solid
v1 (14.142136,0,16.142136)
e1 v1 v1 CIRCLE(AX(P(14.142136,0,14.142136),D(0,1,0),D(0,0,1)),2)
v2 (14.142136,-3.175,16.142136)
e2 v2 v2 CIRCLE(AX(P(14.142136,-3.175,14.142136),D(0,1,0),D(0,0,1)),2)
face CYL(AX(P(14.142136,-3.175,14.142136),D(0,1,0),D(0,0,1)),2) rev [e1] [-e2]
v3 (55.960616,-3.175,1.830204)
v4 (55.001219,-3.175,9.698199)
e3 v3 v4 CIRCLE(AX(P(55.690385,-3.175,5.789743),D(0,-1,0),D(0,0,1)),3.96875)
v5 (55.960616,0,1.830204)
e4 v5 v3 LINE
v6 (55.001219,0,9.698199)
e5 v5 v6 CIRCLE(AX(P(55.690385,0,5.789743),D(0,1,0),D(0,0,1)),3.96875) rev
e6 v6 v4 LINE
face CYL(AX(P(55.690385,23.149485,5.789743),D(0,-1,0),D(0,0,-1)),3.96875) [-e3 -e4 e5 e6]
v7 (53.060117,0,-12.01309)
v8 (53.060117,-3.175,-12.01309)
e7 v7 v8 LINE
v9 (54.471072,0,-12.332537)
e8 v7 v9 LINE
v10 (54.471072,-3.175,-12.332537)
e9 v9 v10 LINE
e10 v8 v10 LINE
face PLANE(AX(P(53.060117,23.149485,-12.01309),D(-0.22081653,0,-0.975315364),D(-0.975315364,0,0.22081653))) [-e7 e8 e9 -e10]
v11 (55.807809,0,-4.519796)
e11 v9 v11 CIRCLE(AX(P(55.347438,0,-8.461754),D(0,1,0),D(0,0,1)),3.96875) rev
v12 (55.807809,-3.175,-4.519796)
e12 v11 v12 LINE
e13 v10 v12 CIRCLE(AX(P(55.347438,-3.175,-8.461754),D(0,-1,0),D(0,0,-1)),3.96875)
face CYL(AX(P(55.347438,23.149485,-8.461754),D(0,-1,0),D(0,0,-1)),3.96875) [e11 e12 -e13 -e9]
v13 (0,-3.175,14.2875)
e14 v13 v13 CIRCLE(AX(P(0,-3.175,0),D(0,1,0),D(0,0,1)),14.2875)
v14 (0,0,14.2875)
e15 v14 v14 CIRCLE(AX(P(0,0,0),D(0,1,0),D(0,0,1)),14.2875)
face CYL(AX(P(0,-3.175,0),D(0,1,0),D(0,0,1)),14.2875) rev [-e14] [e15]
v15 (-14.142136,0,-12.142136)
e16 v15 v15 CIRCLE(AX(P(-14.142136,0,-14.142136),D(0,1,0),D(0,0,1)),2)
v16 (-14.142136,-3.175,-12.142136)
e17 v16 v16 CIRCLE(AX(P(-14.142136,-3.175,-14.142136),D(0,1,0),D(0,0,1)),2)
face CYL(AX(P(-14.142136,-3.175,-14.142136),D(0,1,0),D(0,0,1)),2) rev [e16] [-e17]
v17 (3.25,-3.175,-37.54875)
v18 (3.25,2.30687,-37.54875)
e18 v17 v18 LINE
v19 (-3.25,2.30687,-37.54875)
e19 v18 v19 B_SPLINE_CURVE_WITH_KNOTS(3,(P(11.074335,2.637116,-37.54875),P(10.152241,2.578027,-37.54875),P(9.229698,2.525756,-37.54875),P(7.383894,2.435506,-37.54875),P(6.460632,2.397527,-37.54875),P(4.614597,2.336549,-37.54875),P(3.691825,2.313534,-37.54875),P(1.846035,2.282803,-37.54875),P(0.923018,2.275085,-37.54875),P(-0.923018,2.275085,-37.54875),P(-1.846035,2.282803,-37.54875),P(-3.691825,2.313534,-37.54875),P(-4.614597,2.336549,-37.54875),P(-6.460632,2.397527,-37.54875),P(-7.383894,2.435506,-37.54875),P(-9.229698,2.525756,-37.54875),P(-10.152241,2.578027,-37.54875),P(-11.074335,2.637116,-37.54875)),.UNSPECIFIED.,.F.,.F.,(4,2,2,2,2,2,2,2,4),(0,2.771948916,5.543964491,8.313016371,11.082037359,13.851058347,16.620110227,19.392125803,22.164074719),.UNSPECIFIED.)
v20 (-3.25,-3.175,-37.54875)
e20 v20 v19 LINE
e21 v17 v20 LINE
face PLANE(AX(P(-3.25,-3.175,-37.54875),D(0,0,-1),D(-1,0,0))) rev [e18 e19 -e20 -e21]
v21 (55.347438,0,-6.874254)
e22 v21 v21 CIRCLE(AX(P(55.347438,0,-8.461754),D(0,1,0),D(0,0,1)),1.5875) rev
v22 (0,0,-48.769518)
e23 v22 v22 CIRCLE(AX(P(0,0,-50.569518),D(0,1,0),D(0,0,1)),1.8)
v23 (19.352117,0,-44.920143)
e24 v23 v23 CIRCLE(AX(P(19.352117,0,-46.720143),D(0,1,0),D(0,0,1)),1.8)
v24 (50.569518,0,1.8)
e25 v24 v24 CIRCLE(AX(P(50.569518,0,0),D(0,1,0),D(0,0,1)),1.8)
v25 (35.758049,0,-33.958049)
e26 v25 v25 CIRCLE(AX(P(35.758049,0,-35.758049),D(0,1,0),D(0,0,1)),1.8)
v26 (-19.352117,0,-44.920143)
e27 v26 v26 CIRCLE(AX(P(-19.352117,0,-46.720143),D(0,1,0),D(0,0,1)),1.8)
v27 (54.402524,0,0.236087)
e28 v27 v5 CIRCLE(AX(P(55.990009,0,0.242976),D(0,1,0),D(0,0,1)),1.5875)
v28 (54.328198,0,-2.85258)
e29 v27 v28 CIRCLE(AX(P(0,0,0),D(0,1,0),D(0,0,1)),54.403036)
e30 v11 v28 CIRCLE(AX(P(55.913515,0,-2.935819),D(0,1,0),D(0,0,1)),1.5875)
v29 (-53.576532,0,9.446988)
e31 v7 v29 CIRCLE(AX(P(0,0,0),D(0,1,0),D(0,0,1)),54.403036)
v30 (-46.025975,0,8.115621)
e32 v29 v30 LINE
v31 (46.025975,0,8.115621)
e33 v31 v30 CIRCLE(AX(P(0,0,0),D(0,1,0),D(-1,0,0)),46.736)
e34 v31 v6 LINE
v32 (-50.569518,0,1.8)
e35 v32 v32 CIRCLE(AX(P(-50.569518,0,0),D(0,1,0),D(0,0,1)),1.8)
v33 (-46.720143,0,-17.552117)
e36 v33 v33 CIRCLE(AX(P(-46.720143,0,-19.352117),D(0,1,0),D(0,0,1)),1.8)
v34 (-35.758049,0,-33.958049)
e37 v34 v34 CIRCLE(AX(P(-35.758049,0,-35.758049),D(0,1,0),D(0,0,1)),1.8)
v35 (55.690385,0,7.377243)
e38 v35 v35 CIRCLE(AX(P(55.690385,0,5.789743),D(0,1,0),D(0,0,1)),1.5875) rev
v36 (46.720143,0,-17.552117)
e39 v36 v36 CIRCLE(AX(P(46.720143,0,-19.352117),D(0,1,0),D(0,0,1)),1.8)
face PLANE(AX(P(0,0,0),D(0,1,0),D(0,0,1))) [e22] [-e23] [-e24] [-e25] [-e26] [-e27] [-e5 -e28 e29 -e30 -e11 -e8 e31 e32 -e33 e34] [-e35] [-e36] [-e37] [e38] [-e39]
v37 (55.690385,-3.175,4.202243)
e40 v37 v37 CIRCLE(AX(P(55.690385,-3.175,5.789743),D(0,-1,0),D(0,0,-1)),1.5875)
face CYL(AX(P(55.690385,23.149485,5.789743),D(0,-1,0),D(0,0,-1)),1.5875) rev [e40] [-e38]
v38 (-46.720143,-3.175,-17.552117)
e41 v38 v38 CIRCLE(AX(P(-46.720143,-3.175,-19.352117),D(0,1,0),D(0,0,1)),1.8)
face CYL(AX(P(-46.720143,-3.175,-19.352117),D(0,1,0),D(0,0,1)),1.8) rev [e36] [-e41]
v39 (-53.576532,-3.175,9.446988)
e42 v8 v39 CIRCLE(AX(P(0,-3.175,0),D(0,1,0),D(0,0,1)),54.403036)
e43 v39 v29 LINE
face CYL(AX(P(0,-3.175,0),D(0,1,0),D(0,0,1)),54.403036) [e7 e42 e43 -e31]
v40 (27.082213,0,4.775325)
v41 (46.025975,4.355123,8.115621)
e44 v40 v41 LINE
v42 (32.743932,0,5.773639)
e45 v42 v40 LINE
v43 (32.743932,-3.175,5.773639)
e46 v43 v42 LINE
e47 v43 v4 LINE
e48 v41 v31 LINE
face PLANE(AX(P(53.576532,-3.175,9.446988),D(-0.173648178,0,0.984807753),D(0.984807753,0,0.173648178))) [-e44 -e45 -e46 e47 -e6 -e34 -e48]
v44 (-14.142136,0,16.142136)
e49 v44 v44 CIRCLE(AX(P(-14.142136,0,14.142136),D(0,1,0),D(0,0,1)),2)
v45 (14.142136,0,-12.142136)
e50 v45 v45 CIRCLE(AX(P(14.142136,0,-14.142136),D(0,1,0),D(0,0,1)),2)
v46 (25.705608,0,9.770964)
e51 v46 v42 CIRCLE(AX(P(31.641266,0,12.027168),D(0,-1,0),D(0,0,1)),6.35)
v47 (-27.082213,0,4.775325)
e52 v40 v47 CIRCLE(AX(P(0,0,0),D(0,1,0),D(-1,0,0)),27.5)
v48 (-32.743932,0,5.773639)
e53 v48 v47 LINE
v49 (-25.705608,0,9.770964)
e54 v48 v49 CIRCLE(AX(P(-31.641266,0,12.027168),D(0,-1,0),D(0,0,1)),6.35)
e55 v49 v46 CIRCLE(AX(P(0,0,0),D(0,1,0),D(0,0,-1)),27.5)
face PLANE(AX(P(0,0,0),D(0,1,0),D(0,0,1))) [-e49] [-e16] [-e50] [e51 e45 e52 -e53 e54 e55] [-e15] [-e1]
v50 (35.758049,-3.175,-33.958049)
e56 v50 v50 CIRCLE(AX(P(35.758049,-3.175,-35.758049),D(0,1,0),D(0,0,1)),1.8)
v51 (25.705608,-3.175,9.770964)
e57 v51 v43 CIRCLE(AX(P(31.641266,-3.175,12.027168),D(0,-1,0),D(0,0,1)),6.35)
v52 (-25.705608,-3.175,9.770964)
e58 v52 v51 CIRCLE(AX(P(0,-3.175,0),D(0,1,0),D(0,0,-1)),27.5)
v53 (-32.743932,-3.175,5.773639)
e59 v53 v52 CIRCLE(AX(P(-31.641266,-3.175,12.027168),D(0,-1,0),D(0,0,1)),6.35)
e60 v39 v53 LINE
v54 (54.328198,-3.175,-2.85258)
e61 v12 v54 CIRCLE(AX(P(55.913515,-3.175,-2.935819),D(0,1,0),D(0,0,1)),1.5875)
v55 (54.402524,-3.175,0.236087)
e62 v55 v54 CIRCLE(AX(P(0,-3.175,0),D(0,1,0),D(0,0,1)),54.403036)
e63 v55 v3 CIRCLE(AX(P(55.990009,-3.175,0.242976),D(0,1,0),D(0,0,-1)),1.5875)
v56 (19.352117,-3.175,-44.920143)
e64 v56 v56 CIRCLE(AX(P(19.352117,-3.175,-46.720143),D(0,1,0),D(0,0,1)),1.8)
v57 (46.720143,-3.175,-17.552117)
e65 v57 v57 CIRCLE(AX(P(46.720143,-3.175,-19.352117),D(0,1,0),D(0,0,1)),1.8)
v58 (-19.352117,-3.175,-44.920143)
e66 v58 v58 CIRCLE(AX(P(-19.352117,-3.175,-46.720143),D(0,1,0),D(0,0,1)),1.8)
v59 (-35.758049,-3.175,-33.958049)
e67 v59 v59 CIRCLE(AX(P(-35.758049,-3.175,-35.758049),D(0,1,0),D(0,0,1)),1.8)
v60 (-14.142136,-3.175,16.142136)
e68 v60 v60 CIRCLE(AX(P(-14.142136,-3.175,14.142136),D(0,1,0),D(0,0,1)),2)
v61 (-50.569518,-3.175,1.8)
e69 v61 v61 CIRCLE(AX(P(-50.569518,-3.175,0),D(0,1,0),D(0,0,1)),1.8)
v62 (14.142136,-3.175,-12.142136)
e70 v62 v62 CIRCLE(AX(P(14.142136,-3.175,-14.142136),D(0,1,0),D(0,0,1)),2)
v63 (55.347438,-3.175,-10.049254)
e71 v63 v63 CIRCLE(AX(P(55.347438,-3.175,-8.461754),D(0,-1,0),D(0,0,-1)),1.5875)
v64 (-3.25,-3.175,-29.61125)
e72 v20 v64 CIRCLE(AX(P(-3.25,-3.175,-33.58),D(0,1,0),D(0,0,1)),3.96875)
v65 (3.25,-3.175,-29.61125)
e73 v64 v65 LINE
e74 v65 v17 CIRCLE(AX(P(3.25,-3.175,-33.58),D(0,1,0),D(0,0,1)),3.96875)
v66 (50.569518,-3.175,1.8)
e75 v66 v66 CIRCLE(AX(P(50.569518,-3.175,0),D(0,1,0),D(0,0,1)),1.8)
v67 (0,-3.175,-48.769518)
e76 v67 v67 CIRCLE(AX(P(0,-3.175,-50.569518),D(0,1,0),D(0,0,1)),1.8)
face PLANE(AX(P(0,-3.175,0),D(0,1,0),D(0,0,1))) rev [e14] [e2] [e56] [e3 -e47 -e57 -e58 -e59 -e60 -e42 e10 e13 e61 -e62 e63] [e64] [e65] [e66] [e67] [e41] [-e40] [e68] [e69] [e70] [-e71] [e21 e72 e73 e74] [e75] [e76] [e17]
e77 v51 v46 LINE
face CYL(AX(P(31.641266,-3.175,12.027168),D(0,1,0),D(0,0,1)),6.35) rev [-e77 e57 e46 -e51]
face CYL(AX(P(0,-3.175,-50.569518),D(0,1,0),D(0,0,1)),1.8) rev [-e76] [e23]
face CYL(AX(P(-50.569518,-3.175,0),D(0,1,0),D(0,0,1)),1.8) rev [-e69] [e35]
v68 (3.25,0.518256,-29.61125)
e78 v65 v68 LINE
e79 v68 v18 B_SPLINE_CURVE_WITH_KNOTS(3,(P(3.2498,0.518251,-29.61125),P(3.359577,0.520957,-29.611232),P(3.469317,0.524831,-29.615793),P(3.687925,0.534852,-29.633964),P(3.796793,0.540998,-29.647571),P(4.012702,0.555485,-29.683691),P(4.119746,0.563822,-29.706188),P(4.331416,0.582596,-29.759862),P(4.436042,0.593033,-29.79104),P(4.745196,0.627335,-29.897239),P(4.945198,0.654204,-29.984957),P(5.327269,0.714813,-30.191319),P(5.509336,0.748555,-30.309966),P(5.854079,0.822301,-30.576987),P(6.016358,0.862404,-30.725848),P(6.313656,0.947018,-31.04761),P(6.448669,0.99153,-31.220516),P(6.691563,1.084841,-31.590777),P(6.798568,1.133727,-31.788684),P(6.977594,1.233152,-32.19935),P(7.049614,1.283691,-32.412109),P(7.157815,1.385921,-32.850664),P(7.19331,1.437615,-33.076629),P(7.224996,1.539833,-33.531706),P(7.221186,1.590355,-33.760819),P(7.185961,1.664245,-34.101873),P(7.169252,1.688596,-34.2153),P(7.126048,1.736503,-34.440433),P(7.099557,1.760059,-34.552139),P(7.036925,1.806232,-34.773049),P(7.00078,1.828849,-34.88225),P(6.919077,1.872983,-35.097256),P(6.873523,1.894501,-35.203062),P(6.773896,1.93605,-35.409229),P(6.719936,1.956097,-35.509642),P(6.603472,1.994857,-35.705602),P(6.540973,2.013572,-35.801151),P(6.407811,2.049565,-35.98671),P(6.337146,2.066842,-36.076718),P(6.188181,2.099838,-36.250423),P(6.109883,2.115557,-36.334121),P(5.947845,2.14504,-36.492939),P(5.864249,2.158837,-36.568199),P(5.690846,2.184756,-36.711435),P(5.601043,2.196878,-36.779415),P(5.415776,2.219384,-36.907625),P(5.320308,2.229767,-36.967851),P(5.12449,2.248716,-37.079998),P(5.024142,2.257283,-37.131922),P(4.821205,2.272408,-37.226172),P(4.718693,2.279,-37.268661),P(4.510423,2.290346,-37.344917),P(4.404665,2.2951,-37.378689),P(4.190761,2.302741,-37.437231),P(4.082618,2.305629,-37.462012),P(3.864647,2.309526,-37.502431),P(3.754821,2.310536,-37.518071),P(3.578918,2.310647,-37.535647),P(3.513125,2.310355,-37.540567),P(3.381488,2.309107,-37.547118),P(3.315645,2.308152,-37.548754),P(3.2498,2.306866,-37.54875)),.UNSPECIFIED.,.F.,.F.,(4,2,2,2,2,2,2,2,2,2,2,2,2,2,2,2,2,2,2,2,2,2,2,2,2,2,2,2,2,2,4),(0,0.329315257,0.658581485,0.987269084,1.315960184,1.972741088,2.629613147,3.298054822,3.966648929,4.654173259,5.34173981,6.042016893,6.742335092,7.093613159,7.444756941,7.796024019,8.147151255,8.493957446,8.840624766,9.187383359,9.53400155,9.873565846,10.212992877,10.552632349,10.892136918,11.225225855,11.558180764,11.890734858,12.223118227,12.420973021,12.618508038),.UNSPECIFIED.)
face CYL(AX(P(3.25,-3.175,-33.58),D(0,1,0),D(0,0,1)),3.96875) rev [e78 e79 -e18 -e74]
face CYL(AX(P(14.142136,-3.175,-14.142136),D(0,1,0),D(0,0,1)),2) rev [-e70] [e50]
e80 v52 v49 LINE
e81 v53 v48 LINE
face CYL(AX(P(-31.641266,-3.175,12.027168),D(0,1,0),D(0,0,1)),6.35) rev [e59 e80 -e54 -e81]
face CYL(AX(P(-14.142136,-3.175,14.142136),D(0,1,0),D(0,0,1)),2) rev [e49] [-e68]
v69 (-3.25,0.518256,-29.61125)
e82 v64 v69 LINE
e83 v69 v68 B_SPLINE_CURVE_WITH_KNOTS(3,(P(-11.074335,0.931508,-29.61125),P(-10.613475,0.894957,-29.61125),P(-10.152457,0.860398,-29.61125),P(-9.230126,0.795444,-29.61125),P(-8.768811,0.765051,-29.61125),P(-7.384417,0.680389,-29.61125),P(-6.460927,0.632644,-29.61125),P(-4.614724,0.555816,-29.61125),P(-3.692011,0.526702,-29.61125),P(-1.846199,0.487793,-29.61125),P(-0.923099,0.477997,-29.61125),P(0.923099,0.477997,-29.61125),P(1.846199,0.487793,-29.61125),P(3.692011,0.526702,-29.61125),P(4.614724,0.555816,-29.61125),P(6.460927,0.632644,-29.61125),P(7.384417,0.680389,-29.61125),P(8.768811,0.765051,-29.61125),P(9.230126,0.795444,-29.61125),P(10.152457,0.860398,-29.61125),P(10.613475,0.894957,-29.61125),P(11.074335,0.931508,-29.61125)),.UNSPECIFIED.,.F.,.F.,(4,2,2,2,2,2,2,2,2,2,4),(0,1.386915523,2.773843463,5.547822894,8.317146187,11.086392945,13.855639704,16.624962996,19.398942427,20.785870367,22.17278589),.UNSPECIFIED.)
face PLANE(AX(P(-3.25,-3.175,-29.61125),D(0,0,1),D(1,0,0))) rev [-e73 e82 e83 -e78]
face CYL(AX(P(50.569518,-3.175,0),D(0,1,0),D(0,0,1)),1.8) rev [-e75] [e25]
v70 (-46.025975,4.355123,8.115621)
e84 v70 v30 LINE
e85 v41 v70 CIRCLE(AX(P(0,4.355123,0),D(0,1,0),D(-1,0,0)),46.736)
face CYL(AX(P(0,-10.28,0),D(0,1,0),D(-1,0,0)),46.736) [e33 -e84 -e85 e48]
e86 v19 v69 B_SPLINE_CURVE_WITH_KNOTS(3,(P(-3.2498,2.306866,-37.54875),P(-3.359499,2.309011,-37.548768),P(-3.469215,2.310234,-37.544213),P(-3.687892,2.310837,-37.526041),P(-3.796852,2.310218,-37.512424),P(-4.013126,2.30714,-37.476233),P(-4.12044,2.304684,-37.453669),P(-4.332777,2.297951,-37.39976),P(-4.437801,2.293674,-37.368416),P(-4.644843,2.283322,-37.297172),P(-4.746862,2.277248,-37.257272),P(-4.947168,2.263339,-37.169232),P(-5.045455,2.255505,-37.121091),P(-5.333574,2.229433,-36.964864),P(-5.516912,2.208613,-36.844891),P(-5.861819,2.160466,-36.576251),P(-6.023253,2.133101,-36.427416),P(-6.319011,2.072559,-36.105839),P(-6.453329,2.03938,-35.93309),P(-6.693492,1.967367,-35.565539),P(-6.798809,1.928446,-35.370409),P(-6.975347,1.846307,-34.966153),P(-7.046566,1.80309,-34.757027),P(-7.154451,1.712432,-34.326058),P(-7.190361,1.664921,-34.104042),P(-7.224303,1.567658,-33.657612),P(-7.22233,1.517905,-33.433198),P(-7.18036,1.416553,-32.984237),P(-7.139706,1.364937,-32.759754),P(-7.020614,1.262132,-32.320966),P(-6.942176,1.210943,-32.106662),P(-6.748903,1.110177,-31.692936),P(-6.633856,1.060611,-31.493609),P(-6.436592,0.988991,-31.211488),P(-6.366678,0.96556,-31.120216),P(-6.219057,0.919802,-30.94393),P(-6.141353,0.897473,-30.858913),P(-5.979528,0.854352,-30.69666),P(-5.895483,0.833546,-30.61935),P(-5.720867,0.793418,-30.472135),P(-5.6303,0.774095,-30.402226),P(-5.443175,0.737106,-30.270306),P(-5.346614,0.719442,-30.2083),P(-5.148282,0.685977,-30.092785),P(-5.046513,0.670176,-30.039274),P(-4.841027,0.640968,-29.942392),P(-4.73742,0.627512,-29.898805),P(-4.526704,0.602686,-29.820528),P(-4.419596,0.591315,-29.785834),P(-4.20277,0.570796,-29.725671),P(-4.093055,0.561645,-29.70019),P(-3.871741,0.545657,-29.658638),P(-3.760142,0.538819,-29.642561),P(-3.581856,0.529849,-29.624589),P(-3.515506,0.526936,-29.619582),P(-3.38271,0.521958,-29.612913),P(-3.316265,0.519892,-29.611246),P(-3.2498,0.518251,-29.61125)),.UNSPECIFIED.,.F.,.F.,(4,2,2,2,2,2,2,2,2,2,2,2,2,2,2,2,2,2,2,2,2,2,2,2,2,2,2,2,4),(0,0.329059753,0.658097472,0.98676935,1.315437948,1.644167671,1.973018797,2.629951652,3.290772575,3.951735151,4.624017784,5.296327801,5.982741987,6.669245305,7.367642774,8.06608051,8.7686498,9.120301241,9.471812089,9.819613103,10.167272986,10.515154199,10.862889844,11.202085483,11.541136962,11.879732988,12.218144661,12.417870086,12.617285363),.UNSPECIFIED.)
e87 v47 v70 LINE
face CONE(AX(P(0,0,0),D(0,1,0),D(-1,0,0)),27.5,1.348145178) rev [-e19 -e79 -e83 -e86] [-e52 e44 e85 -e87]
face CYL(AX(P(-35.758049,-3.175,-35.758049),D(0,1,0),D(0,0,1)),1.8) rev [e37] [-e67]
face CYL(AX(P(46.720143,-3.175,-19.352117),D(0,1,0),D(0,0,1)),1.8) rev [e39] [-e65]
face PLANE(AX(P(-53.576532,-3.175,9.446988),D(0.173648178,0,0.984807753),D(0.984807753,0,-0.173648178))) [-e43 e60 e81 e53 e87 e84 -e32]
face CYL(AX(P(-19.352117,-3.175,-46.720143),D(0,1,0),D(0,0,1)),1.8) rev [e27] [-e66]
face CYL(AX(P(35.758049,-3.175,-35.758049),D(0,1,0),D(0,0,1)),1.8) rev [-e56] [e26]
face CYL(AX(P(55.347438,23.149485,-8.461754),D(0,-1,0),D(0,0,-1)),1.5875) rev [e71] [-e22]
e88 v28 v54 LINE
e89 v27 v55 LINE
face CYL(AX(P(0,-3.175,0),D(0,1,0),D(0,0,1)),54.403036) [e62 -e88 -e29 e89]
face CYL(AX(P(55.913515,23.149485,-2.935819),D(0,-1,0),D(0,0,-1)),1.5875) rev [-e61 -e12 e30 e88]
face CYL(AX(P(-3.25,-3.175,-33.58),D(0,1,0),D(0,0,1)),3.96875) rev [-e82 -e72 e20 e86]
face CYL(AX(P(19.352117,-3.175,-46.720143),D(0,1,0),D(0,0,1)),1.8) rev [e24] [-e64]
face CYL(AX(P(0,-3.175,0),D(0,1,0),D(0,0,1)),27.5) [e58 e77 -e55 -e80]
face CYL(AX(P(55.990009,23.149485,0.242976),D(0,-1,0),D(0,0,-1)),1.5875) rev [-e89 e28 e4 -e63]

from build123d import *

# Parameters (mm, degrees)
SKETCH1_R           = 1.8
SKETCH1_R_2         = 2
SKETCH1_R_3         = 14.2875
BOSS_EXTRUDE1_DEPTH = 3.175
REVOLVE3_ANGLE      = 200
BOSS_EXTRUDE2_START = -3.175
SKETCH3_R           = 1.5875
BOSS_EXTRUDE2_DEPTH = 3.175
CUT_EXTRUDE1_DEPTH  = 81.857095427


# Read off the part's stored shape, not the designer's step: Revolve3
with BuildPart() as part:
    # Sketch1 → Boss-Extrude1 (new body)
    with BuildSketch(Plane(origin=(0, 0, 0), x_dir=(1, 0, 0), z_dir=(0, 1, 0))):
        with BuildLine():
            Line((53.576531883, -9.446988104), (32.743932203, -5.773638702))
            ThreePointArc((32.743932203, -5.773638702), (28.505328465, -6.505538278), (25.705607757, -9.770963609))
            ThreePointArc((25.705607757, -9.770963609), (0, -27.5), (-25.705607757, -9.770963609))
            ThreePointArc((-25.705607757, -9.770963609), (-28.505328465, -6.505538278), (-32.743932203, -5.773638702))
            Line((-32.743932203, -5.773638702), (-53.576531883, -9.446988104))
            ThreePointArc((-53.576531883, -9.446988104), (0, 54.403036246), (53.576531883, -9.446988104))
        make_face()
        with Locations(Location((-50.569518123, 0, 0), (0, 0, 270))):
            Circle(SKETCH1_R, mode=Mode.SUBTRACT)
        with Locations(Location((-46.720142763, 19.352116768, 0), (0, 0, 270))):
            Circle(SKETCH1_R, mode=Mode.SUBTRACT)
        with Locations(Location((-35.758049186, 35.758049186, 0), (0, 0, 270))):
            Circle(SKETCH1_R, mode=Mode.SUBTRACT)
        with Locations(Location((-19.352116768, 46.720142763, 0), (0, 0, 270))):
            Circle(SKETCH1_R, mode=Mode.SUBTRACT)
        with Locations(Location((0, 50.569518123, 0), (0, 0, 270))):
            Circle(SKETCH1_R, mode=Mode.SUBTRACT)
        with Locations(Location((19.352116768, 46.720142763, 0), (0, 0, 270))):
            Circle(SKETCH1_R, mode=Mode.SUBTRACT)
        with Locations(Location((35.758049186, 35.758049186, 0), (0, 0, 270))):
            Circle(SKETCH1_R, mode=Mode.SUBTRACT)
        with Locations(Location((46.720142763, 19.352116768, 0), (0, 0, 270))):
            Circle(SKETCH1_R, mode=Mode.SUBTRACT)
        with Locations(Location((50.569518123, 0, 0), (0, 0, 270))):
            Circle(SKETCH1_R, mode=Mode.SUBTRACT)
        with Locations(Location((14.142135624, 14.142135624, 0), (0, 0, 270))):
            Circle(SKETCH1_R_2, mode=Mode.SUBTRACT)
        with Locations(Location((-14.142135624, 14.142135624, 0), (0, 0, 270))):
            Circle(SKETCH1_R_2, mode=Mode.SUBTRACT)
        with Locations(Location((-14.142135624, -14.142135624, 0), (0, 0, 270))):
            Circle(SKETCH1_R_2, mode=Mode.SUBTRACT)
        with Locations(Location((14.142135624, -14.142135624, 0), (0, 0, 270))):
            Circle(SKETCH1_R_2, mode=Mode.SUBTRACT)
        with Locations(Location((0, 0, 0), (0, 0, 270))):
            Circle(SKETCH1_R_3, mode=Mode.SUBTRACT)
        with BuildLine():
            Line((-3.25, 37.54875), (3.25, 37.54875))
            ThreePointArc((3.25, 37.54875), (7.21875, 33.58), (3.25, 29.61125))
            Line((3.25, 29.61125), (-3.25, 29.61125))
            ThreePointArc((-3.25, 29.61125), (-7.21875, 33.58), (-3.25, 37.54875))
        make_face(mode=Mode.SUBTRACT)
    extrude(amount=-BOSS_EXTRUDE1_DEPTH)

    # Revolve3 outline → Revolve3 (revolve)
    with BuildSketch(Plane(origin=(0, 0, 0), x_dir=(0.9848077530122042, 0, 0.1736481776669518), z_dir=(-0.1736481776669518, 0, 0.9848077530122042))):
        Polygon((46.736, 0), (46.736, 4.35512275), (27.5, 0), align=None)
    revolve(axis=Axis((0, 0, 0), (0, 1, 0)), revolution_arc=REVOLVE3_ANGLE)

    # Sketch3 → Boss-Extrude2 (add)
    with BuildSketch(Plane.XZ.offset(3.175).offset(BOSS_EXTRUDE2_START)):
        with BuildLine():
            Line((53.060117126, -12.013089669), (54.471072105, -12.3325373))
            ThreePointArc((54.471072105, -12.3325373), (59.259341774, -9.131069871), (55.807809409, -4.519796246))
            ThreePointArc((55.807809409, -4.519796246), (54.72616849, -3.989558211), (54.328198384, -2.85258009))
            ThreePointArc((54.328198384, -2.85258009), (54.387291369, -1.308774374), (54.402523984, 0.236086798))
            ThreePointArc((54.402523984, 0.236086798), (54.854722203, 1.352606489), (55.960615645, 1.830203754))
            ThreePointArc((55.960615645, 1.830203754), (59.629955631, 6.270120891), (55.001219172, 9.698198912))
            Line((55.001219172, 9.698198912), (53.576531883, 9.446988104))
            Line((53.576531883, 9.446988104), (53.060117126, -12.013089669))
        make_face()
        with Locations(Location((55.690385377, 5.789743142, 0), (0, 0, 270))):
            Circle(SKETCH3_R, mode=Mode.SUBTRACT)
        with Locations(Location((55.347437708, -8.461754447, 0), (0, 0, 270))):
            Circle(SKETCH3_R, mode=Mode.SUBTRACT)
    extrude(amount=BOSS_EXTRUDE2_DEPTH)

    # Sketch4 → Cut-Extrude1 (cut, through all)
    with BuildSketch(Plane.XZ):
        with BuildLine():
            Line((-3.25, -37.54875), (3.25, -37.54875))
            ThreePointArc((3.25, -37.54875), (7.21875, -33.58), (3.25, -29.61125))
            Line((3.25, -29.61125), (-3.25, -29.61125))
            ThreePointArc((-3.25, -29.61125), (-7.21875, -33.58), (-3.25, -37.54875))
        make_face()
    extrude(amount=-CUT_EXTRUDE1_DEPTH, mode=Mode.SUBTRACT)


solid = part.part
